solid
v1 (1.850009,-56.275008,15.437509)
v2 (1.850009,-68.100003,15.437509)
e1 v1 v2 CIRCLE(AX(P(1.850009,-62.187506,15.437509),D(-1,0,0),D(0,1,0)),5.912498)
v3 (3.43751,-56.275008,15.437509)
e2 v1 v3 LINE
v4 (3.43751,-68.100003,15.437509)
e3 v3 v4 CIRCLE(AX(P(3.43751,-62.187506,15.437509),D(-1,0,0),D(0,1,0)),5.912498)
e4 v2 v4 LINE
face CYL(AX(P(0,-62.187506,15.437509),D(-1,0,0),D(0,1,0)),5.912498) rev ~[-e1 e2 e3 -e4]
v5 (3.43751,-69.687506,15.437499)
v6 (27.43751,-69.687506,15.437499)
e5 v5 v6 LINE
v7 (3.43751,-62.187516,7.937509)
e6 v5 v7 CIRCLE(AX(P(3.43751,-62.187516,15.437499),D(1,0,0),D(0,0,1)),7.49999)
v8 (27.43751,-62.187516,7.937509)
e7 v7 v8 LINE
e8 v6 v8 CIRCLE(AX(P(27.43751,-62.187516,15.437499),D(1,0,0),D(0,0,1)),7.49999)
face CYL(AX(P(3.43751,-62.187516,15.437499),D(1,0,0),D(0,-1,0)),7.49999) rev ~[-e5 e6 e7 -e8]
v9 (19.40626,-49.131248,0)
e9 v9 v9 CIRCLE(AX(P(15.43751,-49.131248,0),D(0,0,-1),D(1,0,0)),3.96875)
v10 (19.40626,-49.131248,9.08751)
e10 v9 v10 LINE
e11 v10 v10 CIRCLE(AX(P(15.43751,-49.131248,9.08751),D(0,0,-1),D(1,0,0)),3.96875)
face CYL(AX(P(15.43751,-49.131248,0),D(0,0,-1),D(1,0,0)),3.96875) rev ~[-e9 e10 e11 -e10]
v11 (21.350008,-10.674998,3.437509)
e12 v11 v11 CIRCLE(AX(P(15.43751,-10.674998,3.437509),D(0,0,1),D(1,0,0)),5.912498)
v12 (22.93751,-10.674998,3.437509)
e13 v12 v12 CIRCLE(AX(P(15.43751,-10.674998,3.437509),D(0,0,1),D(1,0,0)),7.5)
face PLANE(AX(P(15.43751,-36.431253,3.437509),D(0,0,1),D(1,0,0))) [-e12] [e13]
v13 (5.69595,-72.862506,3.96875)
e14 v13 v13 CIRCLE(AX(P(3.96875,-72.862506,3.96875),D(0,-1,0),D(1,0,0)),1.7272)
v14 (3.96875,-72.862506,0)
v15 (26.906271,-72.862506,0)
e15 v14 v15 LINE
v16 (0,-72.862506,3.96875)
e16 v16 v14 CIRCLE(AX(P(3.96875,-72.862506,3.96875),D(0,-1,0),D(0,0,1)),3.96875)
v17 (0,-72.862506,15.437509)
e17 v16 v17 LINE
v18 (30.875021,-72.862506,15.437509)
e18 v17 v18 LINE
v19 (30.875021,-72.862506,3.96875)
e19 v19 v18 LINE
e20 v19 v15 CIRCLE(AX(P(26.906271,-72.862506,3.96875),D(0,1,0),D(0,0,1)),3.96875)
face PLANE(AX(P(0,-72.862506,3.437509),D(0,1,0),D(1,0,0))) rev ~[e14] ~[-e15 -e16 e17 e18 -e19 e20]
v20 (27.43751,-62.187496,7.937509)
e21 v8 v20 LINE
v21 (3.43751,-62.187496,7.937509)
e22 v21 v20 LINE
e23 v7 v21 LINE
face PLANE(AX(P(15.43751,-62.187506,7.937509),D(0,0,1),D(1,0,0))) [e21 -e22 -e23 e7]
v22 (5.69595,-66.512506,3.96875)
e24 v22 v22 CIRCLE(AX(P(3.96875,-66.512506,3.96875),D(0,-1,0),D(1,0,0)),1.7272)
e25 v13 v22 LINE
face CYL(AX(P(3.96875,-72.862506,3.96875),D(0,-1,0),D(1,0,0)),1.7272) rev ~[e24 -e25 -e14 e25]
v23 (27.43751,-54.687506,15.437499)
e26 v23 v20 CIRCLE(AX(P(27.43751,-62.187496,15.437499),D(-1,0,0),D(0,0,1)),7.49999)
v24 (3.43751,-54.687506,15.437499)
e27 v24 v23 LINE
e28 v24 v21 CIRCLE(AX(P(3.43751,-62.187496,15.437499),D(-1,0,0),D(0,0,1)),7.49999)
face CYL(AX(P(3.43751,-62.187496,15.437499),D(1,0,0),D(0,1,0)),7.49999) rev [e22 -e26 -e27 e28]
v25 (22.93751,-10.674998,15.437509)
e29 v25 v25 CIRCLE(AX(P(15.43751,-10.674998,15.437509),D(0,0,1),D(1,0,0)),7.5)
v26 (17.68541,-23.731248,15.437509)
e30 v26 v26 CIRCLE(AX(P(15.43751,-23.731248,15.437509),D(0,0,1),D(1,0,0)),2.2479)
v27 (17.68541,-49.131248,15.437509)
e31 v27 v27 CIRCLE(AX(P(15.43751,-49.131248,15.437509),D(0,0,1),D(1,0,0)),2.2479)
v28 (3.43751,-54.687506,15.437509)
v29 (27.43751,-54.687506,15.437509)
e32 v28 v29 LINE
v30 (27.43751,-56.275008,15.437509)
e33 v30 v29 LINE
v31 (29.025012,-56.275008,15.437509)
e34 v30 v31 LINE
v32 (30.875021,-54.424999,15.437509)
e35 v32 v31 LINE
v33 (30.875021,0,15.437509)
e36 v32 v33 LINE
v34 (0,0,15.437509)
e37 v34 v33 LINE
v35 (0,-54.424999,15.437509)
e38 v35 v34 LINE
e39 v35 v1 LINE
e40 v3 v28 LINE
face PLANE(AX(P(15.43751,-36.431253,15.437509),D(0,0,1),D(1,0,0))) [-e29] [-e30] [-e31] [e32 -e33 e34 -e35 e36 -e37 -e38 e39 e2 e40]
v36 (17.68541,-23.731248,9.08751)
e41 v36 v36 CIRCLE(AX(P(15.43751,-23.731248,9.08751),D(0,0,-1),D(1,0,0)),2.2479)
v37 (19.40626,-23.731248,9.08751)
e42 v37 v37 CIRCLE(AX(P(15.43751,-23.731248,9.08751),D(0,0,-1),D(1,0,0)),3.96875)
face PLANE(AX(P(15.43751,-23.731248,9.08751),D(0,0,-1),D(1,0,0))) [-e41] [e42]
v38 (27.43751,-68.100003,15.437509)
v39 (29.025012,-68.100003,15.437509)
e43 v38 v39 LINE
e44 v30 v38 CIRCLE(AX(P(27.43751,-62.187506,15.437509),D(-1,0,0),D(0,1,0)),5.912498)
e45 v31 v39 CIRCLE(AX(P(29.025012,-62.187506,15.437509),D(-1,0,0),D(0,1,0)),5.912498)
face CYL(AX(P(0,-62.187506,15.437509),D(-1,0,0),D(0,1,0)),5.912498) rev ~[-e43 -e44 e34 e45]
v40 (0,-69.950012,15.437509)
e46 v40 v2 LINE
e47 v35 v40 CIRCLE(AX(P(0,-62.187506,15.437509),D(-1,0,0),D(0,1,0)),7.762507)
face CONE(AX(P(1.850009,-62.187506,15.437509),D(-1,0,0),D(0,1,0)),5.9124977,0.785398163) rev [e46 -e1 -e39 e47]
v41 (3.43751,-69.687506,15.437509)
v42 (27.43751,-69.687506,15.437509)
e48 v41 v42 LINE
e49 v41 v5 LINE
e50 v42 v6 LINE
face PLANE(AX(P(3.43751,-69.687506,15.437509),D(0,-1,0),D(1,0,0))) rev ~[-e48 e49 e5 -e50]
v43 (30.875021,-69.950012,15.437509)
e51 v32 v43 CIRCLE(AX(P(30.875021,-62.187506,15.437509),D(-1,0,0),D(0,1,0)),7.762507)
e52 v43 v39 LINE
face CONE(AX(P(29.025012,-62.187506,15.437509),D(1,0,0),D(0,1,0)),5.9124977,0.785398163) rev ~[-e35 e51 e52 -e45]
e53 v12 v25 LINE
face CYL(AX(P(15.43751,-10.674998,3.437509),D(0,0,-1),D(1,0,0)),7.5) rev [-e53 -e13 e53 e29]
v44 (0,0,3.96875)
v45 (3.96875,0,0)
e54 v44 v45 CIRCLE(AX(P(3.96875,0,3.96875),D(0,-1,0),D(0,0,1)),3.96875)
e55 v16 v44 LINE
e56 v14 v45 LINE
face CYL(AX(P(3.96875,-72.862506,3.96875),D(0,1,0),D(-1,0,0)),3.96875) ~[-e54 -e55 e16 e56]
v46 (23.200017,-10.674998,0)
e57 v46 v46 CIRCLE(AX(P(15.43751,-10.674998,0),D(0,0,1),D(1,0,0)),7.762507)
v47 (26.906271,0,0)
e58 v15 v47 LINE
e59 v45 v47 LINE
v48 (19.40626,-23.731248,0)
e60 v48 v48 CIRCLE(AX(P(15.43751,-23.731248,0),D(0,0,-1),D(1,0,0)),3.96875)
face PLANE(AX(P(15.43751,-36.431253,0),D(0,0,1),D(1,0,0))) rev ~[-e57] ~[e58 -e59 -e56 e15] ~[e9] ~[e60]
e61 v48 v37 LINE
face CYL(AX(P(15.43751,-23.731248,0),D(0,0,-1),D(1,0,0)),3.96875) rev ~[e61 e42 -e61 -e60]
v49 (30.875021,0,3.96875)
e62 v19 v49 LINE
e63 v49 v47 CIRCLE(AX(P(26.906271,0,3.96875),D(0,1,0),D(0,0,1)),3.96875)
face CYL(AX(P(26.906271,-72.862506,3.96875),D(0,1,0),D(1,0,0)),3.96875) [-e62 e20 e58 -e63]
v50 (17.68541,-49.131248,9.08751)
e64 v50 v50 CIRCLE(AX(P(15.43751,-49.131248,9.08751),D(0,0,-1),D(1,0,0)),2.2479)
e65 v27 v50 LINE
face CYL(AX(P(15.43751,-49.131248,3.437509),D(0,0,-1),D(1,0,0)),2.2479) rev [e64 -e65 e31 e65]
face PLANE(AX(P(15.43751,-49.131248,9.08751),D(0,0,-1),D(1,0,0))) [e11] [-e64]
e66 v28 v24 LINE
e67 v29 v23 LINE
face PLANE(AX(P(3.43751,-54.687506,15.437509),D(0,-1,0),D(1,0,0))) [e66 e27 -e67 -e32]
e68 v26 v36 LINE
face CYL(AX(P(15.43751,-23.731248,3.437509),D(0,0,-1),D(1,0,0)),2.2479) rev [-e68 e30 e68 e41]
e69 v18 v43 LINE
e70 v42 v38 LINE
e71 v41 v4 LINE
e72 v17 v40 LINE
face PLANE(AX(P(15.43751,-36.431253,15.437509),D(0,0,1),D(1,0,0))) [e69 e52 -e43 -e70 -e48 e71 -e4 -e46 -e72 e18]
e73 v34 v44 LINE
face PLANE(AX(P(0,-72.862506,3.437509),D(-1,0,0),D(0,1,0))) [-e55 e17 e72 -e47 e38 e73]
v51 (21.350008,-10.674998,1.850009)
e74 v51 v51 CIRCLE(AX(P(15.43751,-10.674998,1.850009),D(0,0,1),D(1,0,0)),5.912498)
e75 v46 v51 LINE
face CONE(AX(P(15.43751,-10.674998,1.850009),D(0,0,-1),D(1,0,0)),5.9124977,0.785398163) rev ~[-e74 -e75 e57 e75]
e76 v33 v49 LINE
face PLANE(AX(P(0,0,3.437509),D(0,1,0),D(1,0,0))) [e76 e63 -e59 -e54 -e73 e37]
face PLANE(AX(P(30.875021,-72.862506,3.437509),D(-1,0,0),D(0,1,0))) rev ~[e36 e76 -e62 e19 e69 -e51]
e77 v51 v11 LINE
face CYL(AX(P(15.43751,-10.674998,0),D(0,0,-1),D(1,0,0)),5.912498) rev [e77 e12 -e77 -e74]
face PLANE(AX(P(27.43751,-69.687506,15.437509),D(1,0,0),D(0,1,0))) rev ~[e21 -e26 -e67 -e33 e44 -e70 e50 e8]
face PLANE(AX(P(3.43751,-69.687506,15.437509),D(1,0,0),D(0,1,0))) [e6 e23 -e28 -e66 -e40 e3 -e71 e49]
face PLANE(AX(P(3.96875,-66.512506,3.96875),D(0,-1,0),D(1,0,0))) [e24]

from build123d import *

# Parameters (mm, degrees)
F0_W      = 30.8750208
F0_H      = 72.8625058
F0_R      = 2.2479
F0_R_2    = 5.9124977
F1_DEPTH  = 3.437509
F2_W      = 30.8750208
F2_H      = 72.8625058
F2_R      = 2.2479
F2_R_2    = 7.5
F3_DEPTH  = 12
F4_W      = 24
F4_H      = 15
F5_DEPTH  = 7.5
F6_R      = 7.49999
F8_DEPTH  = 30.8750208
F9_R      = 3.96875
F10_DEPTH = 9.0875104
F11_R     = 3.96875
F12_R     = 1.7272
F13_DEPTH = 6.35
F14_SIZE  = 1.850009


# Not quite as in the source:
# - a fillet or chamfer is up to 0.001 mm smaller than in the source, because OpenCascade refuses the exact size


with BuildPart() as f1:
    # F0 (on Top) → F1 (new body)
    with BuildSketch(Plane.XY):
        with Locations((15.4375104, -36.4312529)):
            Rectangle(F0_W, F0_H)
        with Locations((15.4375104, -49.1312477)):
            Circle(F0_R, mode=Mode.SUBTRACT)
        with Locations((15.4375104, -23.7312477)):
            Circle(F0_R, mode=Mode.SUBTRACT)
        with Locations((15.4375104, -10.6749977)):
            Circle(F0_R_2, mode=Mode.SUBTRACT)
    extrude(amount=F1_DEPTH)

    # F2 (on face) → F3 (join)
    with BuildSketch(Plane.XY.offset(3.437509)):
        with Locations((15.4375104, -36.4312529)):
            Rectangle(F2_W, F2_H)
        with Locations((15.4375104, -49.1312477)):
            Circle(F2_R, mode=Mode.SUBTRACT)
        with Locations((15.4375104, -23.7312477)):
            Circle(F2_R, mode=Mode.SUBTRACT)
        with Locations((15.4375104, -10.6749977)):
            Circle(F2_R_2, mode=Mode.SUBTRACT)
    extrude(amount=F3_DEPTH)

    # F4 (on face) → F5 (cut)
    with BuildSketch(Plane.XY.offset(15.437509)):
        with Locations((15.4375104, -62.1875058)):
            Rectangle(F4_W, F4_H)
    extrude(amount=-F5_DEPTH, mode=Mode.SUBTRACT)

    # F6 (radius 7.5 in the source; OpenCascade refuses exactly that, so slightly less here)
    f6_edges = [f1.edges().sort_by_distance(p)[0] for p in [
        (15.43751, -54.687506, 7.937509),
        (15.43751, -69.687506, 7.937509),
    ]]
    fillet(f6_edges, radius=F6_R)

    # F7 (on face) → F8 (cut, through all)
    with BuildSketch(Plane(origin=(0, 0, 0), x_dir=(0, -1, 0), z_dir=(-1, 0, 0))):
        with BuildLine():
            Line((68.1000035, 15.437509), (56.2750081, 15.437509))
            ThreePointArc((56.2750081, 15.437509), (62.1875058, 9.5250113), (68.1000035, 15.437509))
        make_face()
    extrude(amount=-F8_DEPTH, mode=Mode.SUBTRACT)

    # F9 (on face) → F10 (cut)
    with BuildSketch(Plane(origin=(0, 0, 0), x_dir=(1, 0, 0), z_dir=(0, 0, -1))):
        with Locations((15.4375104, 23.7312477)):
            Circle(F9_R)
        with Locations((15.4375104, 49.1312477)):
            Circle(F9_R)
    extrude(amount=-F10_DEPTH, mode=Mode.SUBTRACT)

    # F11
    f11_edges = [f1.edges().sort_by_distance(p)[0] for p in [
        (0, -36.431253, 0),
        (30.875021, -36.431253, 0),
    ]]
    fillet(f11_edges, radius=F11_R)

    # F12 (on face) → F13 (cut)
    with BuildSketch(Plane.XZ.offset(72.8625058)):
        with Locations((3.96875, 3.96875)):
            Circle(F12_R)
    extrude(amount=-F13_DEPTH, mode=Mode.SUBTRACT)

    # F14
    f14_edges = [f1.edges().sort_by_distance(p)[0] for p in [
        (9.525013, -10.674998, 0),
        (30.875021, -62.187506, 9.525011),
        (0, -62.187506, 9.525011),
    ]]
    chamfer(f14_edges, length=F14_SIZE)


solid = f1.part
